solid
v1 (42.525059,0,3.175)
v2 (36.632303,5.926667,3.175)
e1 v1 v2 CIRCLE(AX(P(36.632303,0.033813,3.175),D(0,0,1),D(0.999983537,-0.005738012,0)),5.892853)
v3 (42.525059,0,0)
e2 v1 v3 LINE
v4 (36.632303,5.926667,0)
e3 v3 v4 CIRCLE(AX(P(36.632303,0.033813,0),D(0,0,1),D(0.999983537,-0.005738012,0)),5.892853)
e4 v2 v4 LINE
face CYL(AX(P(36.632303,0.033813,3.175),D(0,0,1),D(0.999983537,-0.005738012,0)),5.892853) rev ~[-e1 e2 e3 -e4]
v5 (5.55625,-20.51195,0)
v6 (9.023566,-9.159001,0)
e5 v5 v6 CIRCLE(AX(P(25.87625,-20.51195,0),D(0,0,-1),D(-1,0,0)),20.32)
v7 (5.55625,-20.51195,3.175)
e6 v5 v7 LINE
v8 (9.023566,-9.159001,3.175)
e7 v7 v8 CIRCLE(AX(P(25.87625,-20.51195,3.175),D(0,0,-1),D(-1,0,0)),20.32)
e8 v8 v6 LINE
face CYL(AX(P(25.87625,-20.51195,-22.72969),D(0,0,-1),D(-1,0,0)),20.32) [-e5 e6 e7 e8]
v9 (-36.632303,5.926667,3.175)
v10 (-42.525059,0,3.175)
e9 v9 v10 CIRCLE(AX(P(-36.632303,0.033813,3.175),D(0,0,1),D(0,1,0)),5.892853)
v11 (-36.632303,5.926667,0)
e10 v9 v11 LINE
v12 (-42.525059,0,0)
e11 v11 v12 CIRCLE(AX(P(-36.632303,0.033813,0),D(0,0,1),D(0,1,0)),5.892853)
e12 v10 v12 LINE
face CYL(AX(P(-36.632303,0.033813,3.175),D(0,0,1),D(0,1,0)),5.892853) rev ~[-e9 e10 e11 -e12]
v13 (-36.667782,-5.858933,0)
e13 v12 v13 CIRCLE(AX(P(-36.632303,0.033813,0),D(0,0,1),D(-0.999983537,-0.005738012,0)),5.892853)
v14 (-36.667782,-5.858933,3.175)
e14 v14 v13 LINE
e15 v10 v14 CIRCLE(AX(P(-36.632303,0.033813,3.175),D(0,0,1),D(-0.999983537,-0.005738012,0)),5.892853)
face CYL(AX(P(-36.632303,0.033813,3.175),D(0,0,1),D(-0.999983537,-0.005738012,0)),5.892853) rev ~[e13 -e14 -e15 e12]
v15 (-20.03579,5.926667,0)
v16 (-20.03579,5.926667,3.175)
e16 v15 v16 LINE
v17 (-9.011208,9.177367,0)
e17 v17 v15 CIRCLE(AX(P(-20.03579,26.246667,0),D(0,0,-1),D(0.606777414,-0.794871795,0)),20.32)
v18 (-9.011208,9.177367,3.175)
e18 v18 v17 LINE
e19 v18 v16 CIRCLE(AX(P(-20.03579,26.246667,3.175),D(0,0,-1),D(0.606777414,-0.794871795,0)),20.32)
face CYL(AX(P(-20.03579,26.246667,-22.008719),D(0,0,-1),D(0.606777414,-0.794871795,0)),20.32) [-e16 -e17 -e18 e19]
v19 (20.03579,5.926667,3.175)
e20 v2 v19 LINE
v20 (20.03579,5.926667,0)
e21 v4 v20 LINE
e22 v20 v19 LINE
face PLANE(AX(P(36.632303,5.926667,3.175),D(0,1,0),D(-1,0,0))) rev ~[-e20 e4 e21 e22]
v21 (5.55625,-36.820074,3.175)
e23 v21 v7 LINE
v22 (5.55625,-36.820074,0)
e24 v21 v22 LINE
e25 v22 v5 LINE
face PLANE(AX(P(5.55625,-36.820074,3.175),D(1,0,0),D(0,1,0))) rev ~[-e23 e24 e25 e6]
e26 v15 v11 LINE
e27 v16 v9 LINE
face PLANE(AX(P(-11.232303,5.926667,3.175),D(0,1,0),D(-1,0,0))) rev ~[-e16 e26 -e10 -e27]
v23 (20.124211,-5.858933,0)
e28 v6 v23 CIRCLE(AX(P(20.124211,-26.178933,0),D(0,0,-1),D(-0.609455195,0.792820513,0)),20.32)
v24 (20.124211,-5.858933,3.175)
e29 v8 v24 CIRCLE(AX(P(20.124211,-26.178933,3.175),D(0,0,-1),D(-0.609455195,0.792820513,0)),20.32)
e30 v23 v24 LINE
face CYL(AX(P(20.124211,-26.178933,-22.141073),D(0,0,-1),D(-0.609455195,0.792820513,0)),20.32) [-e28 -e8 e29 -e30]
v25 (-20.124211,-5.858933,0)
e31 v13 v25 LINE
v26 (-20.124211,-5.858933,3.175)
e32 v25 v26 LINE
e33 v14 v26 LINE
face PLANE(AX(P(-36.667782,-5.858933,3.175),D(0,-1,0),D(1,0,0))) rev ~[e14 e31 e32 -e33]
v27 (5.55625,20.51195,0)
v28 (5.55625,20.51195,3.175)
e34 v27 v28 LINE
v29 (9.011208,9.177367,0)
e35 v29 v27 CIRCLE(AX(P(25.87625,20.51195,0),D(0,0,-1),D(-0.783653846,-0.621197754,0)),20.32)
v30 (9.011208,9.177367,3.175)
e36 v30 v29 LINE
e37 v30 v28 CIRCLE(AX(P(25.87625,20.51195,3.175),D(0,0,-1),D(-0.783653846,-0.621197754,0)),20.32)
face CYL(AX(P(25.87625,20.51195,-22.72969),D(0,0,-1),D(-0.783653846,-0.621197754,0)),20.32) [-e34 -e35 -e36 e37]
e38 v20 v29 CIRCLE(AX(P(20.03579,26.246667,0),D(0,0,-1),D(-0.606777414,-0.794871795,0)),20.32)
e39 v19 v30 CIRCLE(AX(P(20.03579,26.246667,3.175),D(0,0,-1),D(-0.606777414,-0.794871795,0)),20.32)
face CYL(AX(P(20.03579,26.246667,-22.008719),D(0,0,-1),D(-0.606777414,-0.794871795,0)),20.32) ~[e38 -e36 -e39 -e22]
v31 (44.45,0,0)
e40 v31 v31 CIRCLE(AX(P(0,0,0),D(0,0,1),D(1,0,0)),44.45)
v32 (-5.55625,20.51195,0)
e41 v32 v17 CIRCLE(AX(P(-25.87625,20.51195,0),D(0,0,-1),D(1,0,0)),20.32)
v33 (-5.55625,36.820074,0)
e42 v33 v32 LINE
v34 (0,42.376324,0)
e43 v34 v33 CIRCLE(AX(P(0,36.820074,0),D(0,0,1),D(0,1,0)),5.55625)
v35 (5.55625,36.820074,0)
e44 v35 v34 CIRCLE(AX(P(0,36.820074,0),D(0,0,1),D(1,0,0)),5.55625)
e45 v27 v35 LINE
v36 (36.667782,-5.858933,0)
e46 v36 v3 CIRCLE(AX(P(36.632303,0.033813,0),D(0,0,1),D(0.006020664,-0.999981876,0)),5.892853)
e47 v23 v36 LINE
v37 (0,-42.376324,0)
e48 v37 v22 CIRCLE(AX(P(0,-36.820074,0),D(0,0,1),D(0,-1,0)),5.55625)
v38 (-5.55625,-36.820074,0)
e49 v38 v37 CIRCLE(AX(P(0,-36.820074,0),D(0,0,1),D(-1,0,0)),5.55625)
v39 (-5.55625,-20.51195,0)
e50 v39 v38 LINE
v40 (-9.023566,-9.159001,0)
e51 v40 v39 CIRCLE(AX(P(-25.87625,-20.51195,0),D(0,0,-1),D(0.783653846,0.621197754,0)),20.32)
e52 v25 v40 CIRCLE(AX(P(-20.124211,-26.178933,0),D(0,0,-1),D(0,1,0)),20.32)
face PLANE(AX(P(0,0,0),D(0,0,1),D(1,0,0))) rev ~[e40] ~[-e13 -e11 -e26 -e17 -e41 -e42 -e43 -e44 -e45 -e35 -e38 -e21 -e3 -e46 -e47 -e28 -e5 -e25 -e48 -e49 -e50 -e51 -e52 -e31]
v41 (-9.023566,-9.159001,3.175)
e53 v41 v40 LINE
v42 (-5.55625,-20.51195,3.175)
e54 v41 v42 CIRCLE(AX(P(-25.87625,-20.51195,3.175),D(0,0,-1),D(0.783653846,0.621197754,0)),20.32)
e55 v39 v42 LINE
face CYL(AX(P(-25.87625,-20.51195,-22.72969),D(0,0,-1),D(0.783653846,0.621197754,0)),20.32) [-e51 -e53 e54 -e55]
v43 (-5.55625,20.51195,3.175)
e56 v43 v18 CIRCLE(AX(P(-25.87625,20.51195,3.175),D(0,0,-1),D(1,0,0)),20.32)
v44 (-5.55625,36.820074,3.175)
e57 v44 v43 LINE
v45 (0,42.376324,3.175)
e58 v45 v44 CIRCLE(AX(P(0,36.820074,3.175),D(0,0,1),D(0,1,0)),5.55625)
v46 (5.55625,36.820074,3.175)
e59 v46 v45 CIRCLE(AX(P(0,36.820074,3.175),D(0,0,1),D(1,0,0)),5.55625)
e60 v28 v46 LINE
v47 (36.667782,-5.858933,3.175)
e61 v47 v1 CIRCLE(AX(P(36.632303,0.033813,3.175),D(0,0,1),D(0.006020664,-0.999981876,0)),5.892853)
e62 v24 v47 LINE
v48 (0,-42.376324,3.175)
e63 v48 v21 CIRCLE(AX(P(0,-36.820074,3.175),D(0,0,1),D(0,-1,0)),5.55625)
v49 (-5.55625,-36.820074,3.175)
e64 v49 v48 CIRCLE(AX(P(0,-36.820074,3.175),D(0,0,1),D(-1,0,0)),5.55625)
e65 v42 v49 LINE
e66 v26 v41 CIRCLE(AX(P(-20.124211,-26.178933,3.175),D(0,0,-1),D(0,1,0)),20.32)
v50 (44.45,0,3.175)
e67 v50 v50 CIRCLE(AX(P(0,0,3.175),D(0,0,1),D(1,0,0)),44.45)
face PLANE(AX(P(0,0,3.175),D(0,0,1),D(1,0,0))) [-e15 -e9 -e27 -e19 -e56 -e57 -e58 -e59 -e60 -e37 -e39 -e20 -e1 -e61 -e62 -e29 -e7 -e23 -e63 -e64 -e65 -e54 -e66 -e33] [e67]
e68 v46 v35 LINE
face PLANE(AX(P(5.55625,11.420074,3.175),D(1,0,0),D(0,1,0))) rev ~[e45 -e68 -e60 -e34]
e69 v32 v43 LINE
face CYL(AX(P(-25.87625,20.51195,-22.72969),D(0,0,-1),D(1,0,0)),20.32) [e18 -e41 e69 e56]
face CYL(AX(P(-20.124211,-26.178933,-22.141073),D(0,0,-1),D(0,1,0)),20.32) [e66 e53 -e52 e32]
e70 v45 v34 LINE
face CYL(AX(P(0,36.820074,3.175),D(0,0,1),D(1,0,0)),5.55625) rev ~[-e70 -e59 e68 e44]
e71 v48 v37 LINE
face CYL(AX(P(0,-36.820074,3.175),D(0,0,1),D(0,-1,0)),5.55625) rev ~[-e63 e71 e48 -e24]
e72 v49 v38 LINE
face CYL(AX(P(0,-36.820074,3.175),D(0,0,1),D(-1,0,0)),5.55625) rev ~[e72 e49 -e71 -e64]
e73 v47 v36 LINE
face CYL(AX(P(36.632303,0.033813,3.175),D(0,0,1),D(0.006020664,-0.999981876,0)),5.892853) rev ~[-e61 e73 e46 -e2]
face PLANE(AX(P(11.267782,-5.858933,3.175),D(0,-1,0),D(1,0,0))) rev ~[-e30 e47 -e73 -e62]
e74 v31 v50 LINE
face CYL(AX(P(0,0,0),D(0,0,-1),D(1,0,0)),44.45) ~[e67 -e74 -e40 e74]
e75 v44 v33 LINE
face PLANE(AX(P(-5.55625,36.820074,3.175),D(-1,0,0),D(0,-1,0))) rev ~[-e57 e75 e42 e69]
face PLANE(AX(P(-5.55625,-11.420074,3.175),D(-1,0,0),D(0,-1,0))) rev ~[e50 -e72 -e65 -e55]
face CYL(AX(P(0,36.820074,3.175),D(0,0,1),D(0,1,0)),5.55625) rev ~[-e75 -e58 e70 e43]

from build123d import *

# Parameters (mm, degrees)
F0_R        = 44.45
F0_R_2      = 12.7
F1_DEPTH    = 3.175
F3_DEPTH    = 25.4
F4_T1_DEPTH = 48.6343800889
F4_T3_DEPTH = 47.4571451006
F4_T5_DEPTH = 47.1924378771


# Not quite as in the source:
# - a fillet or chamfer that OpenCascade refuses, or shapes differently, is made with other operations: its cross-section is extruded or revolved along the edge and cut away or added


with BuildPart() as f1:
    # F0 (on Top) → F1 (new body)
    with BuildSketch(Plane.XY):
        Circle(F0_R)
        Circle(F0_R_2, mode=Mode.SUBTRACT)
    extrude(amount=F1_DEPTH)

    # F2 (on face) → F3 (cut)
    with BuildSketch(Plane.XY.offset(3.175)):
        with BuildLine():
            Line((-42.5250590142, 0), (-12.7, 0))
            ThreePointArc((-12.7, 0), (-12.3276162196, 3.0528475792), (-11.2323026233, 5.9266666667))
            Line((-11.2323026233, 5.9266666667), (-36.6323026233, 5.9266666667))
            ThreePointArc((-36.6323026233, 5.9266666667), (-40.8111169187, 4.1887178728), (-42.5250590142, 0))
        make_face()
        with BuildLine():
            ThreePointArc((-11.2677815117, -5.8589333333), (-12.3367504878, -3.0157233628), (-12.7, 0))
            Line((-12.7, 0), (-42.5250590142, 0))
            ThreePointArc((-42.5250590142, 0), (-40.79976808, -4.1324743979), (-36.6677815117, -5.8589333333))
            Line((-36.6677815117, -5.8589333333), (-11.2677815117, -5.8589333333))
        make_face()
        with BuildLine():
            Line((0, 12.7), (0, 42.3763238149))
            ThreePointArc((0, 42.3763238149), (-3.928862053, 40.7489358679), (-5.55625, 36.8200738149))
            Line((-5.55625, 36.8200738149), (-5.55625, 11.4200738149))
            ThreePointArc((-5.55625, 11.4200738149), (-2.8508825433, 12.3758825433), (0, 12.7))
        make_face()
        with BuildLine():
            ThreePointArc((5.55625, 36.8200738149), (3.928862053, 40.7489358679), (0, 42.3763238149))
            Line((0, 42.3763238149), (0, 12.7))
            ThreePointArc((0, 12.7), (2.8508825433, 12.3758825433), (5.55625, 11.4200738149))
            Line((5.55625, 11.4200738149), (5.55625, 36.8200738149))
        make_face()
        with BuildLine():
            ThreePointArc((5.55625, -11.4200738149), (2.8508825433, -12.3758825433), (0, -12.7))
            Line((0, -12.7), (0, -42.3763238149))
            ThreePointArc((0, -42.3763238149), (3.928862053, -40.7489358679), (5.55625, -36.8200738149))
            Line((5.55625, -36.8200738149), (5.55625, -11.4200738149))
        make_face()
        with BuildLine():
            Line((0, -42.3763238149), (0, -12.7))
            ThreePointArc((0, -12.7), (-2.8508825433, -12.3758825433), (-5.55625, -11.4200738149))
            Line((-5.55625, -11.4200738149), (-5.55625, -36.8200738149))
            ThreePointArc((-5.55625, -36.8200738149), (-3.928862053, -40.7489358679), (0, -42.3763238149))
        make_face()
        with BuildLine():
            ThreePointArc((11.2323026233, 5.9266666667), (12.3276162196, 3.0528475792), (12.7, 0))
            Line((12.7, 0), (42.5250590142, 0))
            ThreePointArc((42.5250590142, 0), (40.8111169187, 4.1887178728), (36.6323026233, 5.9266666667))
            Line((36.6323026233, 5.9266666667), (11.2323026233, 5.9266666667))
        make_face()
        with BuildLine():
            Line((42.5250590142, 0), (12.7, 0))
            ThreePointArc((12.7, 0), (12.3367504878, -3.0157233628), (11.2677815117, -5.8589333333))
            Line((11.2677815117, -5.8589333333), (36.6677815117, -5.8589333333))
            ThreePointArc((36.6677815117, -5.8589333333), (40.79976808, -4.1324743979), (42.5250590142, 0))
        make_face()
    extrude(amount=-F3_DEPTH, mode=Mode.SUBTRACT)

    # F4: fillet of radius 20.32 on 8 edges, made by hand

    # F4_s2 → F4_t1 (cut)
    with BuildSketch(Plane.XY.offset(-22.7296900444)):
        with BuildLine():
            ThreePointArc((-9.9524038462, -7.8892114741), (-6.6867352348, -13.8287677255), (-5.55625, -20.5119498327))
            Line((-5.55625, -20.5119498327), (-5.55625, -11.4200738149))
            ThreePointArc((-5.55625, -11.4200738149), (-7.9527563302, -9.901700195), (-9.9524038462, -7.8892114741))
        make_face()
        with BuildLine():
            ThreePointArc((9.9524038462, 7.8892114741), (6.6867352348, 13.8287677255), (5.55625, 20.5119498327))
            Line((5.55625, 20.5119498327), (5.55625, 11.4200738149))
            ThreePointArc((5.55625, 11.4200738149), (7.9527563302, 9.901700195), (9.9524038462, 7.8892114741))
        make_face()
        with BuildLine():
            ThreePointArc((-5.55625, 20.5119498327), (-6.6867352348, 13.8287677255), (-9.9524038462, 7.8892114741))
            ThreePointArc((-9.9524038462, 7.8892114741), (-7.9527563302, 9.901700195), (-5.55625, 11.4200738149))
            Line((-5.55625, 11.4200738149), (-5.55625, 20.5119498327))
        make_face()
        with BuildLine():
            ThreePointArc((5.55625, -20.5119498327), (6.6867352348, -13.8287677255), (9.9524038462, -7.8892114741))
            ThreePointArc((9.9524038462, -7.8892114741), (7.9527563302, -9.901700195), (5.55625, -11.4200738149))
            Line((5.55625, -11.4200738149), (5.55625, -20.5119498327))
        make_face()
    extrude(amount=F4_T1_DEPTH, mode=Mode.SUBTRACT)

    # F4_s4 → F4_t3 (cut)
    with BuildSketch(Plane.XY.offset(-22.1410725503)):
        with BuildLine():
            ThreePointArc((-20.1242105318, -5.8589333333), (-13.5841452612, -6.9401717761), (-7.7400809738, -10.0688205128))
            ThreePointArc((-7.7400809738, -10.0688205128), (-9.7342435034, -8.1568684811), (-11.2677815117, -5.8589333333))
            Line((-11.2677815117, -5.8589333333), (-20.1242105318, -5.8589333333))
        make_face()
        with BuildLine():
            ThreePointArc((7.7400809738, -10.0688205128), (13.5841452612, -6.9401717761), (20.1242105318, -5.8589333333))
            Line((20.1242105318, -5.8589333333), (11.2677815117, -5.8589333333))
            ThreePointArc((11.2677815117, -5.8589333333), (9.7342435034, -8.1568684811), (7.7400809738, -10.0688205128))
        make_face()
    extrude(amount=F4_T3_DEPTH, mode=Mode.SUBTRACT)

    # F4_s6 → F4_t5 (cut)
    with BuildSketch(Plane.XY.offset(-22.0087189386)):
        with BuildLine():
            ThreePointArc((7.7060731534, 10.0948717949), (13.5281820281, 6.9969020993), (20.0357901988, 5.9266666667))
            Line((20.0357901988, 5.9266666667), (11.2323026233, 5.9266666667))
            ThreePointArc((11.2323026233, 5.9266666667), (9.6958239858, 8.2024994506), (7.7060731534, 10.0948717949))
        make_face()
        with BuildLine():
            ThreePointArc((-7.7060731534, 10.0948717949), (-13.5281820281, 6.9969020993), (-20.0357901988, 5.9266666667))
            Line((-20.0357901988, 5.9266666667), (-11.2323026233, 5.9266666667))
            ThreePointArc((-11.2323026233, 5.9266666667), (-9.6958239858, 8.2024994506), (-7.7060731534, 10.0948717949))
        make_face()
    extrude(amount=F4_T5_DEPTH, mode=Mode.SUBTRACT)


solid = f1.part
